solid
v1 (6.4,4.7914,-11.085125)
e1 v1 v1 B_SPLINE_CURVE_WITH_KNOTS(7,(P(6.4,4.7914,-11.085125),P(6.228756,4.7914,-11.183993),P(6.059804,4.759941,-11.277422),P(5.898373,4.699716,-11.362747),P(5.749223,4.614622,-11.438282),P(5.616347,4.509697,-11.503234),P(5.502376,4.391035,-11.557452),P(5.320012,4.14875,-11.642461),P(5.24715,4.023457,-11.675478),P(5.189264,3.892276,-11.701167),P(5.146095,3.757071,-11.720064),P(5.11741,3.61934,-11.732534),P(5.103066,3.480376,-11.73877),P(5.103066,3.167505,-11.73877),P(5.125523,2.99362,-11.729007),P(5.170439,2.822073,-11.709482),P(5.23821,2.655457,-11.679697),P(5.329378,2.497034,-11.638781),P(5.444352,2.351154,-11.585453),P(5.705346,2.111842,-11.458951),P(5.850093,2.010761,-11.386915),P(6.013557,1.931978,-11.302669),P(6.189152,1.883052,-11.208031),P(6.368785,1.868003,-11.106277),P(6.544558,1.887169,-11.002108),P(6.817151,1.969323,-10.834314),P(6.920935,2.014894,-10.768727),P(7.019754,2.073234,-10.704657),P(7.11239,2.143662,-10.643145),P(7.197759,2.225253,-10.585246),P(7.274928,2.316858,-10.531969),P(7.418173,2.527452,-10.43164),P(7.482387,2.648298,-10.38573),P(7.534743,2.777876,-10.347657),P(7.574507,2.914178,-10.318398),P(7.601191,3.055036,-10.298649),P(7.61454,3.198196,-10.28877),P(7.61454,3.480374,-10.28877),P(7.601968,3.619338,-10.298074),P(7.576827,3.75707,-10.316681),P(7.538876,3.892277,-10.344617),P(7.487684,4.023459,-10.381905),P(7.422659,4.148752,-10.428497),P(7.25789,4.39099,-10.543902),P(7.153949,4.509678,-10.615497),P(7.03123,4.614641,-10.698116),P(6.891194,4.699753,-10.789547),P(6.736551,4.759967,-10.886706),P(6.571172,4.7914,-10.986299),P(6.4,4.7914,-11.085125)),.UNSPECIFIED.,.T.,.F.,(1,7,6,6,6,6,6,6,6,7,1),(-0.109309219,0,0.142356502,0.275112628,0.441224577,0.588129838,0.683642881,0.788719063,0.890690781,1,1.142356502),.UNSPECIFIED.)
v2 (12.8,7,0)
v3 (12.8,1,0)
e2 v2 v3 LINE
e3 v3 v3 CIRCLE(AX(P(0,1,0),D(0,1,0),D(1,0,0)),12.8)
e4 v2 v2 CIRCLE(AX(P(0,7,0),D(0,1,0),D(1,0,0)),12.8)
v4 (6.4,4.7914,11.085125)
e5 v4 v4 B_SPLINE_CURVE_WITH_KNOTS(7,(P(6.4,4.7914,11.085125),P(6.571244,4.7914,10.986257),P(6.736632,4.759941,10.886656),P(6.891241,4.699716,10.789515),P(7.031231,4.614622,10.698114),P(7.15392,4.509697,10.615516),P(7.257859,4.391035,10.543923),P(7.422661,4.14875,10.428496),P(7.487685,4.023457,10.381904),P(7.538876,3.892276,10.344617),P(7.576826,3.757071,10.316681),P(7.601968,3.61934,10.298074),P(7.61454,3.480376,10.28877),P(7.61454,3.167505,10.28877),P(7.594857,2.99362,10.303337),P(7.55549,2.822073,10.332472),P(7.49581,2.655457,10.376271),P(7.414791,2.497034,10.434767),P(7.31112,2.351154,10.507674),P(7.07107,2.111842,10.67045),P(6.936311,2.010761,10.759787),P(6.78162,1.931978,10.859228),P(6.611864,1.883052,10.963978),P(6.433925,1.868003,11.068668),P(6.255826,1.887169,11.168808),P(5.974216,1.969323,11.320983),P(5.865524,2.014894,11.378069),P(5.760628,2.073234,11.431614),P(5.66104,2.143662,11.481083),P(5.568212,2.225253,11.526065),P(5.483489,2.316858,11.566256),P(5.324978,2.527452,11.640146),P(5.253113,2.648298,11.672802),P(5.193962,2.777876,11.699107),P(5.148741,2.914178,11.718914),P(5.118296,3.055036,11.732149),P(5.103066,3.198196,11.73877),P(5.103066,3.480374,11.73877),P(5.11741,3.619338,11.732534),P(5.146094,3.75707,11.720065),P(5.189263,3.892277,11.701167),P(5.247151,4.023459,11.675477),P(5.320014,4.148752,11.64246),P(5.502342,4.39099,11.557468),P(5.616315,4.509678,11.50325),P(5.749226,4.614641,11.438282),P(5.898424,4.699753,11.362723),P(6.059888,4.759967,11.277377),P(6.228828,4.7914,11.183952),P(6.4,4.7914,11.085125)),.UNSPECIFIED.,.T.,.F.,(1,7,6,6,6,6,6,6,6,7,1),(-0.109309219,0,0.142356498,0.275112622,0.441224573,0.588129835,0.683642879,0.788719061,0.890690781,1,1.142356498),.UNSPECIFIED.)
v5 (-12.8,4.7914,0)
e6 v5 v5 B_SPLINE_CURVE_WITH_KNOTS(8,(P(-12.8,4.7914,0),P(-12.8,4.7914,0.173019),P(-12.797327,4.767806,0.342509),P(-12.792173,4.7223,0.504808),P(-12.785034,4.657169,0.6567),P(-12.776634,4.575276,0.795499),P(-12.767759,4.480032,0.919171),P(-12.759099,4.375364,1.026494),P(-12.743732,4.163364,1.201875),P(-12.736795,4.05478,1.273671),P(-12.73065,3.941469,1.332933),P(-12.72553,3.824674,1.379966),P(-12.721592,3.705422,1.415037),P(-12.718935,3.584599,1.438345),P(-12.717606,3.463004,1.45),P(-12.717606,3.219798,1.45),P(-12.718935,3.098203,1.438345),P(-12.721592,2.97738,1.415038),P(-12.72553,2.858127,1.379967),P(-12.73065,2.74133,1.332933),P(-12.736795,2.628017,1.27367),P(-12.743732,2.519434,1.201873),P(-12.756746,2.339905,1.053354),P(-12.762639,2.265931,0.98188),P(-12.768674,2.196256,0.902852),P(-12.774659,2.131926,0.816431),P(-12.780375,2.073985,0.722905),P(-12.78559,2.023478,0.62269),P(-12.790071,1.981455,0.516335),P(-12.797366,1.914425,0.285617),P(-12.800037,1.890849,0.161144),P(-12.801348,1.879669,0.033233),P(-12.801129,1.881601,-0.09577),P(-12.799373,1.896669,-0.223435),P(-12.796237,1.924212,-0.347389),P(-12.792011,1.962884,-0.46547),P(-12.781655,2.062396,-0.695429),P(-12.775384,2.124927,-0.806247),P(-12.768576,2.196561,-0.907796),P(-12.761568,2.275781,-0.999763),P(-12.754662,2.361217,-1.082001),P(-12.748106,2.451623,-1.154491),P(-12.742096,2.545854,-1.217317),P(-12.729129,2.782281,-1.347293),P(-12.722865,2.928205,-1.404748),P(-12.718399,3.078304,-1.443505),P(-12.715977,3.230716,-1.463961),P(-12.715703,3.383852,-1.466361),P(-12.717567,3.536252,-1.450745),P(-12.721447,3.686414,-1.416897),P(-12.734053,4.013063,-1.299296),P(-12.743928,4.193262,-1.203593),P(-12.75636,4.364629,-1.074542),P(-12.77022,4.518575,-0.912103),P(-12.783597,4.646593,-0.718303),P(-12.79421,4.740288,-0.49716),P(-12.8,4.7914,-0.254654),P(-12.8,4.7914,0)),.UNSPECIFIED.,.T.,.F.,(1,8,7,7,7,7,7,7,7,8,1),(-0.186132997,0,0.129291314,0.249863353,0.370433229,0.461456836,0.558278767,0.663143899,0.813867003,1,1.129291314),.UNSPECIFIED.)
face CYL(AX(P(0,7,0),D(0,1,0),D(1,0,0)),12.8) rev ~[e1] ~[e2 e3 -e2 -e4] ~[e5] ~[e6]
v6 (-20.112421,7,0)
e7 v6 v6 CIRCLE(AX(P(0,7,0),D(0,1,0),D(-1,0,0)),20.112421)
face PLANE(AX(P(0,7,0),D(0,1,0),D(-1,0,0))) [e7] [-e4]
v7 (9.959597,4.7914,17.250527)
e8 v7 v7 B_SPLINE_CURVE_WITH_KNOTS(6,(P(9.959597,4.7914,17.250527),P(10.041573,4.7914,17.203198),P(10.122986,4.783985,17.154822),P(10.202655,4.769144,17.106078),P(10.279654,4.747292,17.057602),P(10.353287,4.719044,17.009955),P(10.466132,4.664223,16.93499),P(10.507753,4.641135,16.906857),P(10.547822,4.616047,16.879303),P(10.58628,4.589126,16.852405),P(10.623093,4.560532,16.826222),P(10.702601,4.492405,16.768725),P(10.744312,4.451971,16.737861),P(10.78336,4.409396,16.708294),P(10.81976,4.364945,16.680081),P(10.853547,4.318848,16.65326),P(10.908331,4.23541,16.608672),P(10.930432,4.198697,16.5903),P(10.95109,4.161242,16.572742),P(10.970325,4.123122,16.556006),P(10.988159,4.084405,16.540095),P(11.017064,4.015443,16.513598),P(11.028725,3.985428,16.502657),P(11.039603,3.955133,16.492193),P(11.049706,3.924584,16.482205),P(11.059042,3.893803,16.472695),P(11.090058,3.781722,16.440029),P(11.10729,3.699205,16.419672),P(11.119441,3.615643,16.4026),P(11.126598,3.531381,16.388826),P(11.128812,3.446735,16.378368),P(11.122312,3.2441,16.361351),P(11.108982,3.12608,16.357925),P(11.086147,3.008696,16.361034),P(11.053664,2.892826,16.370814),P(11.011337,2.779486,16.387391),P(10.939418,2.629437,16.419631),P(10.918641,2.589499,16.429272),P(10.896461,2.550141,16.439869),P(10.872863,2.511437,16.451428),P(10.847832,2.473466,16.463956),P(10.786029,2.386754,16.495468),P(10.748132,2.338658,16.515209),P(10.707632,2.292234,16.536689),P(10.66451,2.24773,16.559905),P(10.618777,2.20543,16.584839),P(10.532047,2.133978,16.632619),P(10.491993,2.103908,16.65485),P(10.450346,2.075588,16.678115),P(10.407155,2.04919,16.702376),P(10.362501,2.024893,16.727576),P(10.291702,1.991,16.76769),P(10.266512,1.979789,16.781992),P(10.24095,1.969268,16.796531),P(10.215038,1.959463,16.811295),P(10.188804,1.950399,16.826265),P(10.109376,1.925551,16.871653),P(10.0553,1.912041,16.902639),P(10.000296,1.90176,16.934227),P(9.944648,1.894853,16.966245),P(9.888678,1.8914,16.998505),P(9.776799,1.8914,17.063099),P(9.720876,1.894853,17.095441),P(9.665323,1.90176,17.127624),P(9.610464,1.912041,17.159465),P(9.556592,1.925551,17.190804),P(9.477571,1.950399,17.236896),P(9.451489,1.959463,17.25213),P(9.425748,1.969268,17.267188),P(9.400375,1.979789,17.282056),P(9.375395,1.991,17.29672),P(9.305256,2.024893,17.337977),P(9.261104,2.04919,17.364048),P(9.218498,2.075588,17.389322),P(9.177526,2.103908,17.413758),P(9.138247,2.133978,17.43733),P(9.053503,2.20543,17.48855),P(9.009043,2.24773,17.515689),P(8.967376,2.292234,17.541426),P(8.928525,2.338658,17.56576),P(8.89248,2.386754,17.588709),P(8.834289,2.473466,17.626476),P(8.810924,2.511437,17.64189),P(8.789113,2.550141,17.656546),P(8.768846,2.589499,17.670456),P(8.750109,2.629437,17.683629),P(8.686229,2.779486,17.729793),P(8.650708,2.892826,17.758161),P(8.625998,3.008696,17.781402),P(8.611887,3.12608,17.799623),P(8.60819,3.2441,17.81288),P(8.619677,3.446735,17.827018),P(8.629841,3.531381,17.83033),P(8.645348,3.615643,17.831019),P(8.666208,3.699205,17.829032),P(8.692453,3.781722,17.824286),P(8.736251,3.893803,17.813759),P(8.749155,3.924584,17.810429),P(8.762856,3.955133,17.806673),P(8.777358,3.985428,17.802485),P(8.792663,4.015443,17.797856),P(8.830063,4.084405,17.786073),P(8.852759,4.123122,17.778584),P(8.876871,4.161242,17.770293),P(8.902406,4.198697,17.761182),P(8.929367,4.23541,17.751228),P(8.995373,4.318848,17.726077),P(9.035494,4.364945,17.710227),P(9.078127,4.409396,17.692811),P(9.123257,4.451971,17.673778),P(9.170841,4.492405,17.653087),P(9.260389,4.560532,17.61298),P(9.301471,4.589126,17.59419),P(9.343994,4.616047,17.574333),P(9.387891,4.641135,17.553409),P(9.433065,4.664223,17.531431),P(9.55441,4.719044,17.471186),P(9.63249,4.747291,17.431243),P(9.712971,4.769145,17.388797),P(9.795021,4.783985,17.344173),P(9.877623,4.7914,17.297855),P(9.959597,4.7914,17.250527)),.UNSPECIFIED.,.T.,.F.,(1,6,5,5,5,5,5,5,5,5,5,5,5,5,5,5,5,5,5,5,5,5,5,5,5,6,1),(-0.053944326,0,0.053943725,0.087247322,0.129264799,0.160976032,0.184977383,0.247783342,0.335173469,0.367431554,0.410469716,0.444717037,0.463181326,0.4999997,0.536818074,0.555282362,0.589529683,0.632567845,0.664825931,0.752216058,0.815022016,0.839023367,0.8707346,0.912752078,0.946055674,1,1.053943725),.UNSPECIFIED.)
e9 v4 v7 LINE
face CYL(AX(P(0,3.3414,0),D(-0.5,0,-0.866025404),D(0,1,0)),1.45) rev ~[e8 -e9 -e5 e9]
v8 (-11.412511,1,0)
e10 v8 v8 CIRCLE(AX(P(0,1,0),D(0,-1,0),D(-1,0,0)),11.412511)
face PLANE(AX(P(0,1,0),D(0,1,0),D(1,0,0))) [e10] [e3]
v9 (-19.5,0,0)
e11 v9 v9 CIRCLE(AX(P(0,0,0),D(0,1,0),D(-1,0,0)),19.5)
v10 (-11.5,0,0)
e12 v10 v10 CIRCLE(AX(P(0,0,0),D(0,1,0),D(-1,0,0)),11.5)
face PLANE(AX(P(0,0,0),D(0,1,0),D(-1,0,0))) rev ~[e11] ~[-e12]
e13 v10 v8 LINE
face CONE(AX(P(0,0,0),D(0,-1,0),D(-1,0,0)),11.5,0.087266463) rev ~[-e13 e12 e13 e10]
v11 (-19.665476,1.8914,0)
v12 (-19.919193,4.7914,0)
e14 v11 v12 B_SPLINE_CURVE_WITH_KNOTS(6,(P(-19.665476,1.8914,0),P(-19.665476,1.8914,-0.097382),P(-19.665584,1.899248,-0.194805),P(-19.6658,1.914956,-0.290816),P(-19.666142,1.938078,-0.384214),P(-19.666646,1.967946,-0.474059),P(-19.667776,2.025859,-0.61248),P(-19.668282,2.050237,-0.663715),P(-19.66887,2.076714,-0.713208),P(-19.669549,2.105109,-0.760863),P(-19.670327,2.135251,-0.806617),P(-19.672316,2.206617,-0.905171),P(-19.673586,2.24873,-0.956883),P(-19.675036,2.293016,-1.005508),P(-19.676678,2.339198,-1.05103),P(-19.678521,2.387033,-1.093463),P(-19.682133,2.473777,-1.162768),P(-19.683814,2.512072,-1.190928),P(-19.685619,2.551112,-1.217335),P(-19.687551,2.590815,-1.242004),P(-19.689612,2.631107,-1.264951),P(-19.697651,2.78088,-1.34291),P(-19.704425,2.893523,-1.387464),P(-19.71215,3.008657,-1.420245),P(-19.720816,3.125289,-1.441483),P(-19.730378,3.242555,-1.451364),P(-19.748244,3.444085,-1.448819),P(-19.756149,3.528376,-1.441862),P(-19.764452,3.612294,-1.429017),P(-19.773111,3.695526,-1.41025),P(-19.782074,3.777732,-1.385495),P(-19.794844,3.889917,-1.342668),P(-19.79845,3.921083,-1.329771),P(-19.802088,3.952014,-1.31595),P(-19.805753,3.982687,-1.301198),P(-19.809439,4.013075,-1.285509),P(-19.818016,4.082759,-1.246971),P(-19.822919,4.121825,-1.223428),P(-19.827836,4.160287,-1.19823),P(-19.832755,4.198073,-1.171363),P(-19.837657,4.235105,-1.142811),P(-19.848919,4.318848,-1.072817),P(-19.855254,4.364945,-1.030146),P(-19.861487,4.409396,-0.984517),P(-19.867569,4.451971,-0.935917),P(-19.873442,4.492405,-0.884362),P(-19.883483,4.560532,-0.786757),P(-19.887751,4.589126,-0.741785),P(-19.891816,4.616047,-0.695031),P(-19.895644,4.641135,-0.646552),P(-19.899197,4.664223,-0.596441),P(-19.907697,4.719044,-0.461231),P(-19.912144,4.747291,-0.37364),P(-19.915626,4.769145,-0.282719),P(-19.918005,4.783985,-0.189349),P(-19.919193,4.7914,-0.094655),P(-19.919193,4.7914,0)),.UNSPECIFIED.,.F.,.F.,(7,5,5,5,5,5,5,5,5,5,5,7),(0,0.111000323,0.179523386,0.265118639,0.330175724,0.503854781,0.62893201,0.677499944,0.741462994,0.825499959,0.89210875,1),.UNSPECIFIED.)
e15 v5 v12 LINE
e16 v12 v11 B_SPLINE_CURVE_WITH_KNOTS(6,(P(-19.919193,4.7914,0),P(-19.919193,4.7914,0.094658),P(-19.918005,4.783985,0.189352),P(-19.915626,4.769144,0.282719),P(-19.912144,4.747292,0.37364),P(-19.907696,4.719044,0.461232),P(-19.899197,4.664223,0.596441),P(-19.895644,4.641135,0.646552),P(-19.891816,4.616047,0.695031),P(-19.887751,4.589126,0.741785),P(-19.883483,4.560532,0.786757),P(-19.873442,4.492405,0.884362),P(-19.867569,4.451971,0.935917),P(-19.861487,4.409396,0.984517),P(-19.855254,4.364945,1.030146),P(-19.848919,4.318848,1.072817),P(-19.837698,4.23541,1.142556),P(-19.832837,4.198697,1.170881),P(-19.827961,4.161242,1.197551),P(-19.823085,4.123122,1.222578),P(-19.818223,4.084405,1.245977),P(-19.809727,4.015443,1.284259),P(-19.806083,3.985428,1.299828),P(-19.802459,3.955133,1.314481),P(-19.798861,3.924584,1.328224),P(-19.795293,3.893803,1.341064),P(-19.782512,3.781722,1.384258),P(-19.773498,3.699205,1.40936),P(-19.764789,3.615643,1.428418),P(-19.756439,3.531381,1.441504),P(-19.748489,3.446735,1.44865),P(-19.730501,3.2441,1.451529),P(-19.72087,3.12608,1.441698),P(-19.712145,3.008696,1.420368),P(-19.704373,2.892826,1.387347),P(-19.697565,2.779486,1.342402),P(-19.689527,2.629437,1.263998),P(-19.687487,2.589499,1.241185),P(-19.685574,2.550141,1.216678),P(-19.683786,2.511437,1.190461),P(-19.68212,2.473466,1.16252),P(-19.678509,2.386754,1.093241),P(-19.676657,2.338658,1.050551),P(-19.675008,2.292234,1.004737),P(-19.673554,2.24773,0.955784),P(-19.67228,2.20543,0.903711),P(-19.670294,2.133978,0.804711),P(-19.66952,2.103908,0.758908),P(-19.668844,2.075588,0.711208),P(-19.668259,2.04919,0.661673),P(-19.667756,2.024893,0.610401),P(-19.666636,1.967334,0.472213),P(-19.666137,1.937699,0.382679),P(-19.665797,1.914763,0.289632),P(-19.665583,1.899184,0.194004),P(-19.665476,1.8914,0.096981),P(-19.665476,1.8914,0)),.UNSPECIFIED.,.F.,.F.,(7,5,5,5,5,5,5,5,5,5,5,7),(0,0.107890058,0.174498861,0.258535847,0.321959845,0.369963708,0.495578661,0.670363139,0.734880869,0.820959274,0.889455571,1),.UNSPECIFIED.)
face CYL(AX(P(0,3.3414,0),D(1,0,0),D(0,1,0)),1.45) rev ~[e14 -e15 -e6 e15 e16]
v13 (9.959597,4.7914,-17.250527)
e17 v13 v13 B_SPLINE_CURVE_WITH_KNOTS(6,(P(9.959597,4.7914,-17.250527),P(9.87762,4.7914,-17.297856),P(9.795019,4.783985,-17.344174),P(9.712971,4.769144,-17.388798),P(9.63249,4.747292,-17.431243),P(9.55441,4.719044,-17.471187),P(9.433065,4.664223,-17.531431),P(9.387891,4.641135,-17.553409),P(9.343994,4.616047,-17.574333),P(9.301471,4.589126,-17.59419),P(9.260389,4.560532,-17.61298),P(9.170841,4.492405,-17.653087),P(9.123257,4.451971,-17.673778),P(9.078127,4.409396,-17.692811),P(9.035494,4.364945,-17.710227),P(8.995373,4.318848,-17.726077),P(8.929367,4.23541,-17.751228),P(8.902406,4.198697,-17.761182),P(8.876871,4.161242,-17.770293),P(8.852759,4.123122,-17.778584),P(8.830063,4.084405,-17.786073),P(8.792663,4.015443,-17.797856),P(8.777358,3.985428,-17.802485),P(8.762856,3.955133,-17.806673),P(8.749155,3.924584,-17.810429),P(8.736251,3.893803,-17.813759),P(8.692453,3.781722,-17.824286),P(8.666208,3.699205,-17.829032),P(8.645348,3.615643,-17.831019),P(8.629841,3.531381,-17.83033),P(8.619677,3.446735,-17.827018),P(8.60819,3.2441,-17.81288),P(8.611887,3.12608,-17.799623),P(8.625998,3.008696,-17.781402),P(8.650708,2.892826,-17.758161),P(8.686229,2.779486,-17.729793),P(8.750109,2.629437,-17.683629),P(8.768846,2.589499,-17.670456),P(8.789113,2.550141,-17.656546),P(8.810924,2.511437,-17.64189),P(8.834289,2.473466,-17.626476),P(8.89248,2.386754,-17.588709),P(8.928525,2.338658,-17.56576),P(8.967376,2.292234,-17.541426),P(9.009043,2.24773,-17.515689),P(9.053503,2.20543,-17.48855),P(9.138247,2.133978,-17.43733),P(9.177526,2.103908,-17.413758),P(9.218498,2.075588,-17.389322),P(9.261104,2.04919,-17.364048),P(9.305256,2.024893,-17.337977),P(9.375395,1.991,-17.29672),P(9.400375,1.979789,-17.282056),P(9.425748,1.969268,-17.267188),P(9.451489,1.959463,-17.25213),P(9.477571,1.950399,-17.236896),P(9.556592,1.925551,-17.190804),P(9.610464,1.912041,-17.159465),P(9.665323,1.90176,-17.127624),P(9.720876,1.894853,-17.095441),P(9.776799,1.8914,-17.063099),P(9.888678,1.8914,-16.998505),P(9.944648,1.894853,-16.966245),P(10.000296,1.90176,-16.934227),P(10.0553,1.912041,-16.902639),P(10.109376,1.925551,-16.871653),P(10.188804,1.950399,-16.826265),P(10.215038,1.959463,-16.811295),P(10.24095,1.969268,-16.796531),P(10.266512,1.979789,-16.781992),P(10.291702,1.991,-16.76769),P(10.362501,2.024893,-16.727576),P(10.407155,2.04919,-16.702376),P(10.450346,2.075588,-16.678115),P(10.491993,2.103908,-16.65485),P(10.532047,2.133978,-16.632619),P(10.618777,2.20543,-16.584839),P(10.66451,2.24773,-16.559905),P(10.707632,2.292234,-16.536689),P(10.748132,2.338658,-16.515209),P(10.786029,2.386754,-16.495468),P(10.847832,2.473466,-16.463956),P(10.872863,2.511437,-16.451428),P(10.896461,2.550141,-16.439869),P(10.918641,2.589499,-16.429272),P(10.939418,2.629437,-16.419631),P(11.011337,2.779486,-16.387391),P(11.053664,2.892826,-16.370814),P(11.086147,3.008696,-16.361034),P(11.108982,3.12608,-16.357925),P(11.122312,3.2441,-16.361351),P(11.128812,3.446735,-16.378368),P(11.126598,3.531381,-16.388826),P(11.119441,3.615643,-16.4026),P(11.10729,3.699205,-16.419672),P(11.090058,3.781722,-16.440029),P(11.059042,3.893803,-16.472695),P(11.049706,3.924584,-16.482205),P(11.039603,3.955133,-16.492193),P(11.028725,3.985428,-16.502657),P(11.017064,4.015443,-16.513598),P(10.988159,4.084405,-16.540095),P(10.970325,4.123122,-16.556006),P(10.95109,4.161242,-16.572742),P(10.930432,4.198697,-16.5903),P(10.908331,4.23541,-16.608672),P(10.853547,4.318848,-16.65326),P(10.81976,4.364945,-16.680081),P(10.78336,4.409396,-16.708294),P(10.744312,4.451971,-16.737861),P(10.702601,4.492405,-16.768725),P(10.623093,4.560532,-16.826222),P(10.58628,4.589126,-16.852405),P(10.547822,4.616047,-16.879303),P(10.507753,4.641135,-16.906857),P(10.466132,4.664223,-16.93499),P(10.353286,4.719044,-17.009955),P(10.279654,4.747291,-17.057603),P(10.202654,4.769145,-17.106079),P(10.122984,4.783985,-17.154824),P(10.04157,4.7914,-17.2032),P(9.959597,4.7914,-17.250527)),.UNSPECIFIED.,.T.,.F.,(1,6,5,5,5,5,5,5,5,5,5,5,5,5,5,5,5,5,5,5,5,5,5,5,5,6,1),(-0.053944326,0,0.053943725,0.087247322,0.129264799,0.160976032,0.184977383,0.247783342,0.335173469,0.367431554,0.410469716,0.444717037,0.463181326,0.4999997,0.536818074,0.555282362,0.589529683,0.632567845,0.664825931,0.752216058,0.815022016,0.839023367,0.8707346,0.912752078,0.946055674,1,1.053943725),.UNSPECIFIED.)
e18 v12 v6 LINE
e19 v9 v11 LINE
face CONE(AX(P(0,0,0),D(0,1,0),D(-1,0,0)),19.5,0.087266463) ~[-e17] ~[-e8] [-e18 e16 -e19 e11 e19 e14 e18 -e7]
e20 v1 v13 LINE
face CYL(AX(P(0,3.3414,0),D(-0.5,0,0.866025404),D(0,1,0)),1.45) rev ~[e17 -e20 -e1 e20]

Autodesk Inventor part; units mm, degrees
ref_plane "YZ Plane" through (0, 0, 0) normal (1, 0, 0) x (0, 1, 0)
ref_plane "XZ Plane" through (0, 0, 0) normal (0, 1, 0) x (-1, 0, 0)
ref_plane "XY Plane" through (0, 0, 0) normal (0, 0, 1) x (1, 0, 0)
sketch "Skizze1" plane through (0, 0, 0) normal (0, 1, 0) x (-1, 0, 0)
  circle A0 centre (0, 0) radius 19.5
  line L0 (-8, 0) -> (8, 0) construction
  circle A1 centre (0, 0) radius 11.5
  dimension "d0" = 39
  dimension "d1" = 8
  dimension "d8" = 23
extrude "Extrusion1" add sketch "Skizze1" along normal blind 7 draft 5
sketch "Skizze2" plane through (0, 7, 0) normal (0, 1, 0) x (1, 0, 0)
  circle A0 centre (0, 0) radius 20.1124 projected
  circle A1 centre (0, 0) radius 12.8
  dimension "d5" = 25.6
extrude "Extrusion2" cut sketch "Skizze2" against normal blind 6 contours A1
sketch "Skizze3" plane through (0, 0, 0) normal (1, 0, 0) x (0, 1, 0)
  line L0 (7, 20.1124) -> (7, -20.1124) projected
  line L1 (0, -19.5) -> (0, 19.5) projected
  circle A0 centre (3.3414, 0) radius 1.45
  point P0 (0, 0)
  dimension "d9" = 2.9
extrude "Extrusion3" cut sketch "Skizze3" against normal through all
pattern_circular "Runde Anordnung1" count 3 over 360 about axis through (0, 7, 0) along (0, -1, 0) of "Extrusion3"
properties part number "50_Filteradapter_Fluorescence_CCVTV_Berrybase_100mm"
